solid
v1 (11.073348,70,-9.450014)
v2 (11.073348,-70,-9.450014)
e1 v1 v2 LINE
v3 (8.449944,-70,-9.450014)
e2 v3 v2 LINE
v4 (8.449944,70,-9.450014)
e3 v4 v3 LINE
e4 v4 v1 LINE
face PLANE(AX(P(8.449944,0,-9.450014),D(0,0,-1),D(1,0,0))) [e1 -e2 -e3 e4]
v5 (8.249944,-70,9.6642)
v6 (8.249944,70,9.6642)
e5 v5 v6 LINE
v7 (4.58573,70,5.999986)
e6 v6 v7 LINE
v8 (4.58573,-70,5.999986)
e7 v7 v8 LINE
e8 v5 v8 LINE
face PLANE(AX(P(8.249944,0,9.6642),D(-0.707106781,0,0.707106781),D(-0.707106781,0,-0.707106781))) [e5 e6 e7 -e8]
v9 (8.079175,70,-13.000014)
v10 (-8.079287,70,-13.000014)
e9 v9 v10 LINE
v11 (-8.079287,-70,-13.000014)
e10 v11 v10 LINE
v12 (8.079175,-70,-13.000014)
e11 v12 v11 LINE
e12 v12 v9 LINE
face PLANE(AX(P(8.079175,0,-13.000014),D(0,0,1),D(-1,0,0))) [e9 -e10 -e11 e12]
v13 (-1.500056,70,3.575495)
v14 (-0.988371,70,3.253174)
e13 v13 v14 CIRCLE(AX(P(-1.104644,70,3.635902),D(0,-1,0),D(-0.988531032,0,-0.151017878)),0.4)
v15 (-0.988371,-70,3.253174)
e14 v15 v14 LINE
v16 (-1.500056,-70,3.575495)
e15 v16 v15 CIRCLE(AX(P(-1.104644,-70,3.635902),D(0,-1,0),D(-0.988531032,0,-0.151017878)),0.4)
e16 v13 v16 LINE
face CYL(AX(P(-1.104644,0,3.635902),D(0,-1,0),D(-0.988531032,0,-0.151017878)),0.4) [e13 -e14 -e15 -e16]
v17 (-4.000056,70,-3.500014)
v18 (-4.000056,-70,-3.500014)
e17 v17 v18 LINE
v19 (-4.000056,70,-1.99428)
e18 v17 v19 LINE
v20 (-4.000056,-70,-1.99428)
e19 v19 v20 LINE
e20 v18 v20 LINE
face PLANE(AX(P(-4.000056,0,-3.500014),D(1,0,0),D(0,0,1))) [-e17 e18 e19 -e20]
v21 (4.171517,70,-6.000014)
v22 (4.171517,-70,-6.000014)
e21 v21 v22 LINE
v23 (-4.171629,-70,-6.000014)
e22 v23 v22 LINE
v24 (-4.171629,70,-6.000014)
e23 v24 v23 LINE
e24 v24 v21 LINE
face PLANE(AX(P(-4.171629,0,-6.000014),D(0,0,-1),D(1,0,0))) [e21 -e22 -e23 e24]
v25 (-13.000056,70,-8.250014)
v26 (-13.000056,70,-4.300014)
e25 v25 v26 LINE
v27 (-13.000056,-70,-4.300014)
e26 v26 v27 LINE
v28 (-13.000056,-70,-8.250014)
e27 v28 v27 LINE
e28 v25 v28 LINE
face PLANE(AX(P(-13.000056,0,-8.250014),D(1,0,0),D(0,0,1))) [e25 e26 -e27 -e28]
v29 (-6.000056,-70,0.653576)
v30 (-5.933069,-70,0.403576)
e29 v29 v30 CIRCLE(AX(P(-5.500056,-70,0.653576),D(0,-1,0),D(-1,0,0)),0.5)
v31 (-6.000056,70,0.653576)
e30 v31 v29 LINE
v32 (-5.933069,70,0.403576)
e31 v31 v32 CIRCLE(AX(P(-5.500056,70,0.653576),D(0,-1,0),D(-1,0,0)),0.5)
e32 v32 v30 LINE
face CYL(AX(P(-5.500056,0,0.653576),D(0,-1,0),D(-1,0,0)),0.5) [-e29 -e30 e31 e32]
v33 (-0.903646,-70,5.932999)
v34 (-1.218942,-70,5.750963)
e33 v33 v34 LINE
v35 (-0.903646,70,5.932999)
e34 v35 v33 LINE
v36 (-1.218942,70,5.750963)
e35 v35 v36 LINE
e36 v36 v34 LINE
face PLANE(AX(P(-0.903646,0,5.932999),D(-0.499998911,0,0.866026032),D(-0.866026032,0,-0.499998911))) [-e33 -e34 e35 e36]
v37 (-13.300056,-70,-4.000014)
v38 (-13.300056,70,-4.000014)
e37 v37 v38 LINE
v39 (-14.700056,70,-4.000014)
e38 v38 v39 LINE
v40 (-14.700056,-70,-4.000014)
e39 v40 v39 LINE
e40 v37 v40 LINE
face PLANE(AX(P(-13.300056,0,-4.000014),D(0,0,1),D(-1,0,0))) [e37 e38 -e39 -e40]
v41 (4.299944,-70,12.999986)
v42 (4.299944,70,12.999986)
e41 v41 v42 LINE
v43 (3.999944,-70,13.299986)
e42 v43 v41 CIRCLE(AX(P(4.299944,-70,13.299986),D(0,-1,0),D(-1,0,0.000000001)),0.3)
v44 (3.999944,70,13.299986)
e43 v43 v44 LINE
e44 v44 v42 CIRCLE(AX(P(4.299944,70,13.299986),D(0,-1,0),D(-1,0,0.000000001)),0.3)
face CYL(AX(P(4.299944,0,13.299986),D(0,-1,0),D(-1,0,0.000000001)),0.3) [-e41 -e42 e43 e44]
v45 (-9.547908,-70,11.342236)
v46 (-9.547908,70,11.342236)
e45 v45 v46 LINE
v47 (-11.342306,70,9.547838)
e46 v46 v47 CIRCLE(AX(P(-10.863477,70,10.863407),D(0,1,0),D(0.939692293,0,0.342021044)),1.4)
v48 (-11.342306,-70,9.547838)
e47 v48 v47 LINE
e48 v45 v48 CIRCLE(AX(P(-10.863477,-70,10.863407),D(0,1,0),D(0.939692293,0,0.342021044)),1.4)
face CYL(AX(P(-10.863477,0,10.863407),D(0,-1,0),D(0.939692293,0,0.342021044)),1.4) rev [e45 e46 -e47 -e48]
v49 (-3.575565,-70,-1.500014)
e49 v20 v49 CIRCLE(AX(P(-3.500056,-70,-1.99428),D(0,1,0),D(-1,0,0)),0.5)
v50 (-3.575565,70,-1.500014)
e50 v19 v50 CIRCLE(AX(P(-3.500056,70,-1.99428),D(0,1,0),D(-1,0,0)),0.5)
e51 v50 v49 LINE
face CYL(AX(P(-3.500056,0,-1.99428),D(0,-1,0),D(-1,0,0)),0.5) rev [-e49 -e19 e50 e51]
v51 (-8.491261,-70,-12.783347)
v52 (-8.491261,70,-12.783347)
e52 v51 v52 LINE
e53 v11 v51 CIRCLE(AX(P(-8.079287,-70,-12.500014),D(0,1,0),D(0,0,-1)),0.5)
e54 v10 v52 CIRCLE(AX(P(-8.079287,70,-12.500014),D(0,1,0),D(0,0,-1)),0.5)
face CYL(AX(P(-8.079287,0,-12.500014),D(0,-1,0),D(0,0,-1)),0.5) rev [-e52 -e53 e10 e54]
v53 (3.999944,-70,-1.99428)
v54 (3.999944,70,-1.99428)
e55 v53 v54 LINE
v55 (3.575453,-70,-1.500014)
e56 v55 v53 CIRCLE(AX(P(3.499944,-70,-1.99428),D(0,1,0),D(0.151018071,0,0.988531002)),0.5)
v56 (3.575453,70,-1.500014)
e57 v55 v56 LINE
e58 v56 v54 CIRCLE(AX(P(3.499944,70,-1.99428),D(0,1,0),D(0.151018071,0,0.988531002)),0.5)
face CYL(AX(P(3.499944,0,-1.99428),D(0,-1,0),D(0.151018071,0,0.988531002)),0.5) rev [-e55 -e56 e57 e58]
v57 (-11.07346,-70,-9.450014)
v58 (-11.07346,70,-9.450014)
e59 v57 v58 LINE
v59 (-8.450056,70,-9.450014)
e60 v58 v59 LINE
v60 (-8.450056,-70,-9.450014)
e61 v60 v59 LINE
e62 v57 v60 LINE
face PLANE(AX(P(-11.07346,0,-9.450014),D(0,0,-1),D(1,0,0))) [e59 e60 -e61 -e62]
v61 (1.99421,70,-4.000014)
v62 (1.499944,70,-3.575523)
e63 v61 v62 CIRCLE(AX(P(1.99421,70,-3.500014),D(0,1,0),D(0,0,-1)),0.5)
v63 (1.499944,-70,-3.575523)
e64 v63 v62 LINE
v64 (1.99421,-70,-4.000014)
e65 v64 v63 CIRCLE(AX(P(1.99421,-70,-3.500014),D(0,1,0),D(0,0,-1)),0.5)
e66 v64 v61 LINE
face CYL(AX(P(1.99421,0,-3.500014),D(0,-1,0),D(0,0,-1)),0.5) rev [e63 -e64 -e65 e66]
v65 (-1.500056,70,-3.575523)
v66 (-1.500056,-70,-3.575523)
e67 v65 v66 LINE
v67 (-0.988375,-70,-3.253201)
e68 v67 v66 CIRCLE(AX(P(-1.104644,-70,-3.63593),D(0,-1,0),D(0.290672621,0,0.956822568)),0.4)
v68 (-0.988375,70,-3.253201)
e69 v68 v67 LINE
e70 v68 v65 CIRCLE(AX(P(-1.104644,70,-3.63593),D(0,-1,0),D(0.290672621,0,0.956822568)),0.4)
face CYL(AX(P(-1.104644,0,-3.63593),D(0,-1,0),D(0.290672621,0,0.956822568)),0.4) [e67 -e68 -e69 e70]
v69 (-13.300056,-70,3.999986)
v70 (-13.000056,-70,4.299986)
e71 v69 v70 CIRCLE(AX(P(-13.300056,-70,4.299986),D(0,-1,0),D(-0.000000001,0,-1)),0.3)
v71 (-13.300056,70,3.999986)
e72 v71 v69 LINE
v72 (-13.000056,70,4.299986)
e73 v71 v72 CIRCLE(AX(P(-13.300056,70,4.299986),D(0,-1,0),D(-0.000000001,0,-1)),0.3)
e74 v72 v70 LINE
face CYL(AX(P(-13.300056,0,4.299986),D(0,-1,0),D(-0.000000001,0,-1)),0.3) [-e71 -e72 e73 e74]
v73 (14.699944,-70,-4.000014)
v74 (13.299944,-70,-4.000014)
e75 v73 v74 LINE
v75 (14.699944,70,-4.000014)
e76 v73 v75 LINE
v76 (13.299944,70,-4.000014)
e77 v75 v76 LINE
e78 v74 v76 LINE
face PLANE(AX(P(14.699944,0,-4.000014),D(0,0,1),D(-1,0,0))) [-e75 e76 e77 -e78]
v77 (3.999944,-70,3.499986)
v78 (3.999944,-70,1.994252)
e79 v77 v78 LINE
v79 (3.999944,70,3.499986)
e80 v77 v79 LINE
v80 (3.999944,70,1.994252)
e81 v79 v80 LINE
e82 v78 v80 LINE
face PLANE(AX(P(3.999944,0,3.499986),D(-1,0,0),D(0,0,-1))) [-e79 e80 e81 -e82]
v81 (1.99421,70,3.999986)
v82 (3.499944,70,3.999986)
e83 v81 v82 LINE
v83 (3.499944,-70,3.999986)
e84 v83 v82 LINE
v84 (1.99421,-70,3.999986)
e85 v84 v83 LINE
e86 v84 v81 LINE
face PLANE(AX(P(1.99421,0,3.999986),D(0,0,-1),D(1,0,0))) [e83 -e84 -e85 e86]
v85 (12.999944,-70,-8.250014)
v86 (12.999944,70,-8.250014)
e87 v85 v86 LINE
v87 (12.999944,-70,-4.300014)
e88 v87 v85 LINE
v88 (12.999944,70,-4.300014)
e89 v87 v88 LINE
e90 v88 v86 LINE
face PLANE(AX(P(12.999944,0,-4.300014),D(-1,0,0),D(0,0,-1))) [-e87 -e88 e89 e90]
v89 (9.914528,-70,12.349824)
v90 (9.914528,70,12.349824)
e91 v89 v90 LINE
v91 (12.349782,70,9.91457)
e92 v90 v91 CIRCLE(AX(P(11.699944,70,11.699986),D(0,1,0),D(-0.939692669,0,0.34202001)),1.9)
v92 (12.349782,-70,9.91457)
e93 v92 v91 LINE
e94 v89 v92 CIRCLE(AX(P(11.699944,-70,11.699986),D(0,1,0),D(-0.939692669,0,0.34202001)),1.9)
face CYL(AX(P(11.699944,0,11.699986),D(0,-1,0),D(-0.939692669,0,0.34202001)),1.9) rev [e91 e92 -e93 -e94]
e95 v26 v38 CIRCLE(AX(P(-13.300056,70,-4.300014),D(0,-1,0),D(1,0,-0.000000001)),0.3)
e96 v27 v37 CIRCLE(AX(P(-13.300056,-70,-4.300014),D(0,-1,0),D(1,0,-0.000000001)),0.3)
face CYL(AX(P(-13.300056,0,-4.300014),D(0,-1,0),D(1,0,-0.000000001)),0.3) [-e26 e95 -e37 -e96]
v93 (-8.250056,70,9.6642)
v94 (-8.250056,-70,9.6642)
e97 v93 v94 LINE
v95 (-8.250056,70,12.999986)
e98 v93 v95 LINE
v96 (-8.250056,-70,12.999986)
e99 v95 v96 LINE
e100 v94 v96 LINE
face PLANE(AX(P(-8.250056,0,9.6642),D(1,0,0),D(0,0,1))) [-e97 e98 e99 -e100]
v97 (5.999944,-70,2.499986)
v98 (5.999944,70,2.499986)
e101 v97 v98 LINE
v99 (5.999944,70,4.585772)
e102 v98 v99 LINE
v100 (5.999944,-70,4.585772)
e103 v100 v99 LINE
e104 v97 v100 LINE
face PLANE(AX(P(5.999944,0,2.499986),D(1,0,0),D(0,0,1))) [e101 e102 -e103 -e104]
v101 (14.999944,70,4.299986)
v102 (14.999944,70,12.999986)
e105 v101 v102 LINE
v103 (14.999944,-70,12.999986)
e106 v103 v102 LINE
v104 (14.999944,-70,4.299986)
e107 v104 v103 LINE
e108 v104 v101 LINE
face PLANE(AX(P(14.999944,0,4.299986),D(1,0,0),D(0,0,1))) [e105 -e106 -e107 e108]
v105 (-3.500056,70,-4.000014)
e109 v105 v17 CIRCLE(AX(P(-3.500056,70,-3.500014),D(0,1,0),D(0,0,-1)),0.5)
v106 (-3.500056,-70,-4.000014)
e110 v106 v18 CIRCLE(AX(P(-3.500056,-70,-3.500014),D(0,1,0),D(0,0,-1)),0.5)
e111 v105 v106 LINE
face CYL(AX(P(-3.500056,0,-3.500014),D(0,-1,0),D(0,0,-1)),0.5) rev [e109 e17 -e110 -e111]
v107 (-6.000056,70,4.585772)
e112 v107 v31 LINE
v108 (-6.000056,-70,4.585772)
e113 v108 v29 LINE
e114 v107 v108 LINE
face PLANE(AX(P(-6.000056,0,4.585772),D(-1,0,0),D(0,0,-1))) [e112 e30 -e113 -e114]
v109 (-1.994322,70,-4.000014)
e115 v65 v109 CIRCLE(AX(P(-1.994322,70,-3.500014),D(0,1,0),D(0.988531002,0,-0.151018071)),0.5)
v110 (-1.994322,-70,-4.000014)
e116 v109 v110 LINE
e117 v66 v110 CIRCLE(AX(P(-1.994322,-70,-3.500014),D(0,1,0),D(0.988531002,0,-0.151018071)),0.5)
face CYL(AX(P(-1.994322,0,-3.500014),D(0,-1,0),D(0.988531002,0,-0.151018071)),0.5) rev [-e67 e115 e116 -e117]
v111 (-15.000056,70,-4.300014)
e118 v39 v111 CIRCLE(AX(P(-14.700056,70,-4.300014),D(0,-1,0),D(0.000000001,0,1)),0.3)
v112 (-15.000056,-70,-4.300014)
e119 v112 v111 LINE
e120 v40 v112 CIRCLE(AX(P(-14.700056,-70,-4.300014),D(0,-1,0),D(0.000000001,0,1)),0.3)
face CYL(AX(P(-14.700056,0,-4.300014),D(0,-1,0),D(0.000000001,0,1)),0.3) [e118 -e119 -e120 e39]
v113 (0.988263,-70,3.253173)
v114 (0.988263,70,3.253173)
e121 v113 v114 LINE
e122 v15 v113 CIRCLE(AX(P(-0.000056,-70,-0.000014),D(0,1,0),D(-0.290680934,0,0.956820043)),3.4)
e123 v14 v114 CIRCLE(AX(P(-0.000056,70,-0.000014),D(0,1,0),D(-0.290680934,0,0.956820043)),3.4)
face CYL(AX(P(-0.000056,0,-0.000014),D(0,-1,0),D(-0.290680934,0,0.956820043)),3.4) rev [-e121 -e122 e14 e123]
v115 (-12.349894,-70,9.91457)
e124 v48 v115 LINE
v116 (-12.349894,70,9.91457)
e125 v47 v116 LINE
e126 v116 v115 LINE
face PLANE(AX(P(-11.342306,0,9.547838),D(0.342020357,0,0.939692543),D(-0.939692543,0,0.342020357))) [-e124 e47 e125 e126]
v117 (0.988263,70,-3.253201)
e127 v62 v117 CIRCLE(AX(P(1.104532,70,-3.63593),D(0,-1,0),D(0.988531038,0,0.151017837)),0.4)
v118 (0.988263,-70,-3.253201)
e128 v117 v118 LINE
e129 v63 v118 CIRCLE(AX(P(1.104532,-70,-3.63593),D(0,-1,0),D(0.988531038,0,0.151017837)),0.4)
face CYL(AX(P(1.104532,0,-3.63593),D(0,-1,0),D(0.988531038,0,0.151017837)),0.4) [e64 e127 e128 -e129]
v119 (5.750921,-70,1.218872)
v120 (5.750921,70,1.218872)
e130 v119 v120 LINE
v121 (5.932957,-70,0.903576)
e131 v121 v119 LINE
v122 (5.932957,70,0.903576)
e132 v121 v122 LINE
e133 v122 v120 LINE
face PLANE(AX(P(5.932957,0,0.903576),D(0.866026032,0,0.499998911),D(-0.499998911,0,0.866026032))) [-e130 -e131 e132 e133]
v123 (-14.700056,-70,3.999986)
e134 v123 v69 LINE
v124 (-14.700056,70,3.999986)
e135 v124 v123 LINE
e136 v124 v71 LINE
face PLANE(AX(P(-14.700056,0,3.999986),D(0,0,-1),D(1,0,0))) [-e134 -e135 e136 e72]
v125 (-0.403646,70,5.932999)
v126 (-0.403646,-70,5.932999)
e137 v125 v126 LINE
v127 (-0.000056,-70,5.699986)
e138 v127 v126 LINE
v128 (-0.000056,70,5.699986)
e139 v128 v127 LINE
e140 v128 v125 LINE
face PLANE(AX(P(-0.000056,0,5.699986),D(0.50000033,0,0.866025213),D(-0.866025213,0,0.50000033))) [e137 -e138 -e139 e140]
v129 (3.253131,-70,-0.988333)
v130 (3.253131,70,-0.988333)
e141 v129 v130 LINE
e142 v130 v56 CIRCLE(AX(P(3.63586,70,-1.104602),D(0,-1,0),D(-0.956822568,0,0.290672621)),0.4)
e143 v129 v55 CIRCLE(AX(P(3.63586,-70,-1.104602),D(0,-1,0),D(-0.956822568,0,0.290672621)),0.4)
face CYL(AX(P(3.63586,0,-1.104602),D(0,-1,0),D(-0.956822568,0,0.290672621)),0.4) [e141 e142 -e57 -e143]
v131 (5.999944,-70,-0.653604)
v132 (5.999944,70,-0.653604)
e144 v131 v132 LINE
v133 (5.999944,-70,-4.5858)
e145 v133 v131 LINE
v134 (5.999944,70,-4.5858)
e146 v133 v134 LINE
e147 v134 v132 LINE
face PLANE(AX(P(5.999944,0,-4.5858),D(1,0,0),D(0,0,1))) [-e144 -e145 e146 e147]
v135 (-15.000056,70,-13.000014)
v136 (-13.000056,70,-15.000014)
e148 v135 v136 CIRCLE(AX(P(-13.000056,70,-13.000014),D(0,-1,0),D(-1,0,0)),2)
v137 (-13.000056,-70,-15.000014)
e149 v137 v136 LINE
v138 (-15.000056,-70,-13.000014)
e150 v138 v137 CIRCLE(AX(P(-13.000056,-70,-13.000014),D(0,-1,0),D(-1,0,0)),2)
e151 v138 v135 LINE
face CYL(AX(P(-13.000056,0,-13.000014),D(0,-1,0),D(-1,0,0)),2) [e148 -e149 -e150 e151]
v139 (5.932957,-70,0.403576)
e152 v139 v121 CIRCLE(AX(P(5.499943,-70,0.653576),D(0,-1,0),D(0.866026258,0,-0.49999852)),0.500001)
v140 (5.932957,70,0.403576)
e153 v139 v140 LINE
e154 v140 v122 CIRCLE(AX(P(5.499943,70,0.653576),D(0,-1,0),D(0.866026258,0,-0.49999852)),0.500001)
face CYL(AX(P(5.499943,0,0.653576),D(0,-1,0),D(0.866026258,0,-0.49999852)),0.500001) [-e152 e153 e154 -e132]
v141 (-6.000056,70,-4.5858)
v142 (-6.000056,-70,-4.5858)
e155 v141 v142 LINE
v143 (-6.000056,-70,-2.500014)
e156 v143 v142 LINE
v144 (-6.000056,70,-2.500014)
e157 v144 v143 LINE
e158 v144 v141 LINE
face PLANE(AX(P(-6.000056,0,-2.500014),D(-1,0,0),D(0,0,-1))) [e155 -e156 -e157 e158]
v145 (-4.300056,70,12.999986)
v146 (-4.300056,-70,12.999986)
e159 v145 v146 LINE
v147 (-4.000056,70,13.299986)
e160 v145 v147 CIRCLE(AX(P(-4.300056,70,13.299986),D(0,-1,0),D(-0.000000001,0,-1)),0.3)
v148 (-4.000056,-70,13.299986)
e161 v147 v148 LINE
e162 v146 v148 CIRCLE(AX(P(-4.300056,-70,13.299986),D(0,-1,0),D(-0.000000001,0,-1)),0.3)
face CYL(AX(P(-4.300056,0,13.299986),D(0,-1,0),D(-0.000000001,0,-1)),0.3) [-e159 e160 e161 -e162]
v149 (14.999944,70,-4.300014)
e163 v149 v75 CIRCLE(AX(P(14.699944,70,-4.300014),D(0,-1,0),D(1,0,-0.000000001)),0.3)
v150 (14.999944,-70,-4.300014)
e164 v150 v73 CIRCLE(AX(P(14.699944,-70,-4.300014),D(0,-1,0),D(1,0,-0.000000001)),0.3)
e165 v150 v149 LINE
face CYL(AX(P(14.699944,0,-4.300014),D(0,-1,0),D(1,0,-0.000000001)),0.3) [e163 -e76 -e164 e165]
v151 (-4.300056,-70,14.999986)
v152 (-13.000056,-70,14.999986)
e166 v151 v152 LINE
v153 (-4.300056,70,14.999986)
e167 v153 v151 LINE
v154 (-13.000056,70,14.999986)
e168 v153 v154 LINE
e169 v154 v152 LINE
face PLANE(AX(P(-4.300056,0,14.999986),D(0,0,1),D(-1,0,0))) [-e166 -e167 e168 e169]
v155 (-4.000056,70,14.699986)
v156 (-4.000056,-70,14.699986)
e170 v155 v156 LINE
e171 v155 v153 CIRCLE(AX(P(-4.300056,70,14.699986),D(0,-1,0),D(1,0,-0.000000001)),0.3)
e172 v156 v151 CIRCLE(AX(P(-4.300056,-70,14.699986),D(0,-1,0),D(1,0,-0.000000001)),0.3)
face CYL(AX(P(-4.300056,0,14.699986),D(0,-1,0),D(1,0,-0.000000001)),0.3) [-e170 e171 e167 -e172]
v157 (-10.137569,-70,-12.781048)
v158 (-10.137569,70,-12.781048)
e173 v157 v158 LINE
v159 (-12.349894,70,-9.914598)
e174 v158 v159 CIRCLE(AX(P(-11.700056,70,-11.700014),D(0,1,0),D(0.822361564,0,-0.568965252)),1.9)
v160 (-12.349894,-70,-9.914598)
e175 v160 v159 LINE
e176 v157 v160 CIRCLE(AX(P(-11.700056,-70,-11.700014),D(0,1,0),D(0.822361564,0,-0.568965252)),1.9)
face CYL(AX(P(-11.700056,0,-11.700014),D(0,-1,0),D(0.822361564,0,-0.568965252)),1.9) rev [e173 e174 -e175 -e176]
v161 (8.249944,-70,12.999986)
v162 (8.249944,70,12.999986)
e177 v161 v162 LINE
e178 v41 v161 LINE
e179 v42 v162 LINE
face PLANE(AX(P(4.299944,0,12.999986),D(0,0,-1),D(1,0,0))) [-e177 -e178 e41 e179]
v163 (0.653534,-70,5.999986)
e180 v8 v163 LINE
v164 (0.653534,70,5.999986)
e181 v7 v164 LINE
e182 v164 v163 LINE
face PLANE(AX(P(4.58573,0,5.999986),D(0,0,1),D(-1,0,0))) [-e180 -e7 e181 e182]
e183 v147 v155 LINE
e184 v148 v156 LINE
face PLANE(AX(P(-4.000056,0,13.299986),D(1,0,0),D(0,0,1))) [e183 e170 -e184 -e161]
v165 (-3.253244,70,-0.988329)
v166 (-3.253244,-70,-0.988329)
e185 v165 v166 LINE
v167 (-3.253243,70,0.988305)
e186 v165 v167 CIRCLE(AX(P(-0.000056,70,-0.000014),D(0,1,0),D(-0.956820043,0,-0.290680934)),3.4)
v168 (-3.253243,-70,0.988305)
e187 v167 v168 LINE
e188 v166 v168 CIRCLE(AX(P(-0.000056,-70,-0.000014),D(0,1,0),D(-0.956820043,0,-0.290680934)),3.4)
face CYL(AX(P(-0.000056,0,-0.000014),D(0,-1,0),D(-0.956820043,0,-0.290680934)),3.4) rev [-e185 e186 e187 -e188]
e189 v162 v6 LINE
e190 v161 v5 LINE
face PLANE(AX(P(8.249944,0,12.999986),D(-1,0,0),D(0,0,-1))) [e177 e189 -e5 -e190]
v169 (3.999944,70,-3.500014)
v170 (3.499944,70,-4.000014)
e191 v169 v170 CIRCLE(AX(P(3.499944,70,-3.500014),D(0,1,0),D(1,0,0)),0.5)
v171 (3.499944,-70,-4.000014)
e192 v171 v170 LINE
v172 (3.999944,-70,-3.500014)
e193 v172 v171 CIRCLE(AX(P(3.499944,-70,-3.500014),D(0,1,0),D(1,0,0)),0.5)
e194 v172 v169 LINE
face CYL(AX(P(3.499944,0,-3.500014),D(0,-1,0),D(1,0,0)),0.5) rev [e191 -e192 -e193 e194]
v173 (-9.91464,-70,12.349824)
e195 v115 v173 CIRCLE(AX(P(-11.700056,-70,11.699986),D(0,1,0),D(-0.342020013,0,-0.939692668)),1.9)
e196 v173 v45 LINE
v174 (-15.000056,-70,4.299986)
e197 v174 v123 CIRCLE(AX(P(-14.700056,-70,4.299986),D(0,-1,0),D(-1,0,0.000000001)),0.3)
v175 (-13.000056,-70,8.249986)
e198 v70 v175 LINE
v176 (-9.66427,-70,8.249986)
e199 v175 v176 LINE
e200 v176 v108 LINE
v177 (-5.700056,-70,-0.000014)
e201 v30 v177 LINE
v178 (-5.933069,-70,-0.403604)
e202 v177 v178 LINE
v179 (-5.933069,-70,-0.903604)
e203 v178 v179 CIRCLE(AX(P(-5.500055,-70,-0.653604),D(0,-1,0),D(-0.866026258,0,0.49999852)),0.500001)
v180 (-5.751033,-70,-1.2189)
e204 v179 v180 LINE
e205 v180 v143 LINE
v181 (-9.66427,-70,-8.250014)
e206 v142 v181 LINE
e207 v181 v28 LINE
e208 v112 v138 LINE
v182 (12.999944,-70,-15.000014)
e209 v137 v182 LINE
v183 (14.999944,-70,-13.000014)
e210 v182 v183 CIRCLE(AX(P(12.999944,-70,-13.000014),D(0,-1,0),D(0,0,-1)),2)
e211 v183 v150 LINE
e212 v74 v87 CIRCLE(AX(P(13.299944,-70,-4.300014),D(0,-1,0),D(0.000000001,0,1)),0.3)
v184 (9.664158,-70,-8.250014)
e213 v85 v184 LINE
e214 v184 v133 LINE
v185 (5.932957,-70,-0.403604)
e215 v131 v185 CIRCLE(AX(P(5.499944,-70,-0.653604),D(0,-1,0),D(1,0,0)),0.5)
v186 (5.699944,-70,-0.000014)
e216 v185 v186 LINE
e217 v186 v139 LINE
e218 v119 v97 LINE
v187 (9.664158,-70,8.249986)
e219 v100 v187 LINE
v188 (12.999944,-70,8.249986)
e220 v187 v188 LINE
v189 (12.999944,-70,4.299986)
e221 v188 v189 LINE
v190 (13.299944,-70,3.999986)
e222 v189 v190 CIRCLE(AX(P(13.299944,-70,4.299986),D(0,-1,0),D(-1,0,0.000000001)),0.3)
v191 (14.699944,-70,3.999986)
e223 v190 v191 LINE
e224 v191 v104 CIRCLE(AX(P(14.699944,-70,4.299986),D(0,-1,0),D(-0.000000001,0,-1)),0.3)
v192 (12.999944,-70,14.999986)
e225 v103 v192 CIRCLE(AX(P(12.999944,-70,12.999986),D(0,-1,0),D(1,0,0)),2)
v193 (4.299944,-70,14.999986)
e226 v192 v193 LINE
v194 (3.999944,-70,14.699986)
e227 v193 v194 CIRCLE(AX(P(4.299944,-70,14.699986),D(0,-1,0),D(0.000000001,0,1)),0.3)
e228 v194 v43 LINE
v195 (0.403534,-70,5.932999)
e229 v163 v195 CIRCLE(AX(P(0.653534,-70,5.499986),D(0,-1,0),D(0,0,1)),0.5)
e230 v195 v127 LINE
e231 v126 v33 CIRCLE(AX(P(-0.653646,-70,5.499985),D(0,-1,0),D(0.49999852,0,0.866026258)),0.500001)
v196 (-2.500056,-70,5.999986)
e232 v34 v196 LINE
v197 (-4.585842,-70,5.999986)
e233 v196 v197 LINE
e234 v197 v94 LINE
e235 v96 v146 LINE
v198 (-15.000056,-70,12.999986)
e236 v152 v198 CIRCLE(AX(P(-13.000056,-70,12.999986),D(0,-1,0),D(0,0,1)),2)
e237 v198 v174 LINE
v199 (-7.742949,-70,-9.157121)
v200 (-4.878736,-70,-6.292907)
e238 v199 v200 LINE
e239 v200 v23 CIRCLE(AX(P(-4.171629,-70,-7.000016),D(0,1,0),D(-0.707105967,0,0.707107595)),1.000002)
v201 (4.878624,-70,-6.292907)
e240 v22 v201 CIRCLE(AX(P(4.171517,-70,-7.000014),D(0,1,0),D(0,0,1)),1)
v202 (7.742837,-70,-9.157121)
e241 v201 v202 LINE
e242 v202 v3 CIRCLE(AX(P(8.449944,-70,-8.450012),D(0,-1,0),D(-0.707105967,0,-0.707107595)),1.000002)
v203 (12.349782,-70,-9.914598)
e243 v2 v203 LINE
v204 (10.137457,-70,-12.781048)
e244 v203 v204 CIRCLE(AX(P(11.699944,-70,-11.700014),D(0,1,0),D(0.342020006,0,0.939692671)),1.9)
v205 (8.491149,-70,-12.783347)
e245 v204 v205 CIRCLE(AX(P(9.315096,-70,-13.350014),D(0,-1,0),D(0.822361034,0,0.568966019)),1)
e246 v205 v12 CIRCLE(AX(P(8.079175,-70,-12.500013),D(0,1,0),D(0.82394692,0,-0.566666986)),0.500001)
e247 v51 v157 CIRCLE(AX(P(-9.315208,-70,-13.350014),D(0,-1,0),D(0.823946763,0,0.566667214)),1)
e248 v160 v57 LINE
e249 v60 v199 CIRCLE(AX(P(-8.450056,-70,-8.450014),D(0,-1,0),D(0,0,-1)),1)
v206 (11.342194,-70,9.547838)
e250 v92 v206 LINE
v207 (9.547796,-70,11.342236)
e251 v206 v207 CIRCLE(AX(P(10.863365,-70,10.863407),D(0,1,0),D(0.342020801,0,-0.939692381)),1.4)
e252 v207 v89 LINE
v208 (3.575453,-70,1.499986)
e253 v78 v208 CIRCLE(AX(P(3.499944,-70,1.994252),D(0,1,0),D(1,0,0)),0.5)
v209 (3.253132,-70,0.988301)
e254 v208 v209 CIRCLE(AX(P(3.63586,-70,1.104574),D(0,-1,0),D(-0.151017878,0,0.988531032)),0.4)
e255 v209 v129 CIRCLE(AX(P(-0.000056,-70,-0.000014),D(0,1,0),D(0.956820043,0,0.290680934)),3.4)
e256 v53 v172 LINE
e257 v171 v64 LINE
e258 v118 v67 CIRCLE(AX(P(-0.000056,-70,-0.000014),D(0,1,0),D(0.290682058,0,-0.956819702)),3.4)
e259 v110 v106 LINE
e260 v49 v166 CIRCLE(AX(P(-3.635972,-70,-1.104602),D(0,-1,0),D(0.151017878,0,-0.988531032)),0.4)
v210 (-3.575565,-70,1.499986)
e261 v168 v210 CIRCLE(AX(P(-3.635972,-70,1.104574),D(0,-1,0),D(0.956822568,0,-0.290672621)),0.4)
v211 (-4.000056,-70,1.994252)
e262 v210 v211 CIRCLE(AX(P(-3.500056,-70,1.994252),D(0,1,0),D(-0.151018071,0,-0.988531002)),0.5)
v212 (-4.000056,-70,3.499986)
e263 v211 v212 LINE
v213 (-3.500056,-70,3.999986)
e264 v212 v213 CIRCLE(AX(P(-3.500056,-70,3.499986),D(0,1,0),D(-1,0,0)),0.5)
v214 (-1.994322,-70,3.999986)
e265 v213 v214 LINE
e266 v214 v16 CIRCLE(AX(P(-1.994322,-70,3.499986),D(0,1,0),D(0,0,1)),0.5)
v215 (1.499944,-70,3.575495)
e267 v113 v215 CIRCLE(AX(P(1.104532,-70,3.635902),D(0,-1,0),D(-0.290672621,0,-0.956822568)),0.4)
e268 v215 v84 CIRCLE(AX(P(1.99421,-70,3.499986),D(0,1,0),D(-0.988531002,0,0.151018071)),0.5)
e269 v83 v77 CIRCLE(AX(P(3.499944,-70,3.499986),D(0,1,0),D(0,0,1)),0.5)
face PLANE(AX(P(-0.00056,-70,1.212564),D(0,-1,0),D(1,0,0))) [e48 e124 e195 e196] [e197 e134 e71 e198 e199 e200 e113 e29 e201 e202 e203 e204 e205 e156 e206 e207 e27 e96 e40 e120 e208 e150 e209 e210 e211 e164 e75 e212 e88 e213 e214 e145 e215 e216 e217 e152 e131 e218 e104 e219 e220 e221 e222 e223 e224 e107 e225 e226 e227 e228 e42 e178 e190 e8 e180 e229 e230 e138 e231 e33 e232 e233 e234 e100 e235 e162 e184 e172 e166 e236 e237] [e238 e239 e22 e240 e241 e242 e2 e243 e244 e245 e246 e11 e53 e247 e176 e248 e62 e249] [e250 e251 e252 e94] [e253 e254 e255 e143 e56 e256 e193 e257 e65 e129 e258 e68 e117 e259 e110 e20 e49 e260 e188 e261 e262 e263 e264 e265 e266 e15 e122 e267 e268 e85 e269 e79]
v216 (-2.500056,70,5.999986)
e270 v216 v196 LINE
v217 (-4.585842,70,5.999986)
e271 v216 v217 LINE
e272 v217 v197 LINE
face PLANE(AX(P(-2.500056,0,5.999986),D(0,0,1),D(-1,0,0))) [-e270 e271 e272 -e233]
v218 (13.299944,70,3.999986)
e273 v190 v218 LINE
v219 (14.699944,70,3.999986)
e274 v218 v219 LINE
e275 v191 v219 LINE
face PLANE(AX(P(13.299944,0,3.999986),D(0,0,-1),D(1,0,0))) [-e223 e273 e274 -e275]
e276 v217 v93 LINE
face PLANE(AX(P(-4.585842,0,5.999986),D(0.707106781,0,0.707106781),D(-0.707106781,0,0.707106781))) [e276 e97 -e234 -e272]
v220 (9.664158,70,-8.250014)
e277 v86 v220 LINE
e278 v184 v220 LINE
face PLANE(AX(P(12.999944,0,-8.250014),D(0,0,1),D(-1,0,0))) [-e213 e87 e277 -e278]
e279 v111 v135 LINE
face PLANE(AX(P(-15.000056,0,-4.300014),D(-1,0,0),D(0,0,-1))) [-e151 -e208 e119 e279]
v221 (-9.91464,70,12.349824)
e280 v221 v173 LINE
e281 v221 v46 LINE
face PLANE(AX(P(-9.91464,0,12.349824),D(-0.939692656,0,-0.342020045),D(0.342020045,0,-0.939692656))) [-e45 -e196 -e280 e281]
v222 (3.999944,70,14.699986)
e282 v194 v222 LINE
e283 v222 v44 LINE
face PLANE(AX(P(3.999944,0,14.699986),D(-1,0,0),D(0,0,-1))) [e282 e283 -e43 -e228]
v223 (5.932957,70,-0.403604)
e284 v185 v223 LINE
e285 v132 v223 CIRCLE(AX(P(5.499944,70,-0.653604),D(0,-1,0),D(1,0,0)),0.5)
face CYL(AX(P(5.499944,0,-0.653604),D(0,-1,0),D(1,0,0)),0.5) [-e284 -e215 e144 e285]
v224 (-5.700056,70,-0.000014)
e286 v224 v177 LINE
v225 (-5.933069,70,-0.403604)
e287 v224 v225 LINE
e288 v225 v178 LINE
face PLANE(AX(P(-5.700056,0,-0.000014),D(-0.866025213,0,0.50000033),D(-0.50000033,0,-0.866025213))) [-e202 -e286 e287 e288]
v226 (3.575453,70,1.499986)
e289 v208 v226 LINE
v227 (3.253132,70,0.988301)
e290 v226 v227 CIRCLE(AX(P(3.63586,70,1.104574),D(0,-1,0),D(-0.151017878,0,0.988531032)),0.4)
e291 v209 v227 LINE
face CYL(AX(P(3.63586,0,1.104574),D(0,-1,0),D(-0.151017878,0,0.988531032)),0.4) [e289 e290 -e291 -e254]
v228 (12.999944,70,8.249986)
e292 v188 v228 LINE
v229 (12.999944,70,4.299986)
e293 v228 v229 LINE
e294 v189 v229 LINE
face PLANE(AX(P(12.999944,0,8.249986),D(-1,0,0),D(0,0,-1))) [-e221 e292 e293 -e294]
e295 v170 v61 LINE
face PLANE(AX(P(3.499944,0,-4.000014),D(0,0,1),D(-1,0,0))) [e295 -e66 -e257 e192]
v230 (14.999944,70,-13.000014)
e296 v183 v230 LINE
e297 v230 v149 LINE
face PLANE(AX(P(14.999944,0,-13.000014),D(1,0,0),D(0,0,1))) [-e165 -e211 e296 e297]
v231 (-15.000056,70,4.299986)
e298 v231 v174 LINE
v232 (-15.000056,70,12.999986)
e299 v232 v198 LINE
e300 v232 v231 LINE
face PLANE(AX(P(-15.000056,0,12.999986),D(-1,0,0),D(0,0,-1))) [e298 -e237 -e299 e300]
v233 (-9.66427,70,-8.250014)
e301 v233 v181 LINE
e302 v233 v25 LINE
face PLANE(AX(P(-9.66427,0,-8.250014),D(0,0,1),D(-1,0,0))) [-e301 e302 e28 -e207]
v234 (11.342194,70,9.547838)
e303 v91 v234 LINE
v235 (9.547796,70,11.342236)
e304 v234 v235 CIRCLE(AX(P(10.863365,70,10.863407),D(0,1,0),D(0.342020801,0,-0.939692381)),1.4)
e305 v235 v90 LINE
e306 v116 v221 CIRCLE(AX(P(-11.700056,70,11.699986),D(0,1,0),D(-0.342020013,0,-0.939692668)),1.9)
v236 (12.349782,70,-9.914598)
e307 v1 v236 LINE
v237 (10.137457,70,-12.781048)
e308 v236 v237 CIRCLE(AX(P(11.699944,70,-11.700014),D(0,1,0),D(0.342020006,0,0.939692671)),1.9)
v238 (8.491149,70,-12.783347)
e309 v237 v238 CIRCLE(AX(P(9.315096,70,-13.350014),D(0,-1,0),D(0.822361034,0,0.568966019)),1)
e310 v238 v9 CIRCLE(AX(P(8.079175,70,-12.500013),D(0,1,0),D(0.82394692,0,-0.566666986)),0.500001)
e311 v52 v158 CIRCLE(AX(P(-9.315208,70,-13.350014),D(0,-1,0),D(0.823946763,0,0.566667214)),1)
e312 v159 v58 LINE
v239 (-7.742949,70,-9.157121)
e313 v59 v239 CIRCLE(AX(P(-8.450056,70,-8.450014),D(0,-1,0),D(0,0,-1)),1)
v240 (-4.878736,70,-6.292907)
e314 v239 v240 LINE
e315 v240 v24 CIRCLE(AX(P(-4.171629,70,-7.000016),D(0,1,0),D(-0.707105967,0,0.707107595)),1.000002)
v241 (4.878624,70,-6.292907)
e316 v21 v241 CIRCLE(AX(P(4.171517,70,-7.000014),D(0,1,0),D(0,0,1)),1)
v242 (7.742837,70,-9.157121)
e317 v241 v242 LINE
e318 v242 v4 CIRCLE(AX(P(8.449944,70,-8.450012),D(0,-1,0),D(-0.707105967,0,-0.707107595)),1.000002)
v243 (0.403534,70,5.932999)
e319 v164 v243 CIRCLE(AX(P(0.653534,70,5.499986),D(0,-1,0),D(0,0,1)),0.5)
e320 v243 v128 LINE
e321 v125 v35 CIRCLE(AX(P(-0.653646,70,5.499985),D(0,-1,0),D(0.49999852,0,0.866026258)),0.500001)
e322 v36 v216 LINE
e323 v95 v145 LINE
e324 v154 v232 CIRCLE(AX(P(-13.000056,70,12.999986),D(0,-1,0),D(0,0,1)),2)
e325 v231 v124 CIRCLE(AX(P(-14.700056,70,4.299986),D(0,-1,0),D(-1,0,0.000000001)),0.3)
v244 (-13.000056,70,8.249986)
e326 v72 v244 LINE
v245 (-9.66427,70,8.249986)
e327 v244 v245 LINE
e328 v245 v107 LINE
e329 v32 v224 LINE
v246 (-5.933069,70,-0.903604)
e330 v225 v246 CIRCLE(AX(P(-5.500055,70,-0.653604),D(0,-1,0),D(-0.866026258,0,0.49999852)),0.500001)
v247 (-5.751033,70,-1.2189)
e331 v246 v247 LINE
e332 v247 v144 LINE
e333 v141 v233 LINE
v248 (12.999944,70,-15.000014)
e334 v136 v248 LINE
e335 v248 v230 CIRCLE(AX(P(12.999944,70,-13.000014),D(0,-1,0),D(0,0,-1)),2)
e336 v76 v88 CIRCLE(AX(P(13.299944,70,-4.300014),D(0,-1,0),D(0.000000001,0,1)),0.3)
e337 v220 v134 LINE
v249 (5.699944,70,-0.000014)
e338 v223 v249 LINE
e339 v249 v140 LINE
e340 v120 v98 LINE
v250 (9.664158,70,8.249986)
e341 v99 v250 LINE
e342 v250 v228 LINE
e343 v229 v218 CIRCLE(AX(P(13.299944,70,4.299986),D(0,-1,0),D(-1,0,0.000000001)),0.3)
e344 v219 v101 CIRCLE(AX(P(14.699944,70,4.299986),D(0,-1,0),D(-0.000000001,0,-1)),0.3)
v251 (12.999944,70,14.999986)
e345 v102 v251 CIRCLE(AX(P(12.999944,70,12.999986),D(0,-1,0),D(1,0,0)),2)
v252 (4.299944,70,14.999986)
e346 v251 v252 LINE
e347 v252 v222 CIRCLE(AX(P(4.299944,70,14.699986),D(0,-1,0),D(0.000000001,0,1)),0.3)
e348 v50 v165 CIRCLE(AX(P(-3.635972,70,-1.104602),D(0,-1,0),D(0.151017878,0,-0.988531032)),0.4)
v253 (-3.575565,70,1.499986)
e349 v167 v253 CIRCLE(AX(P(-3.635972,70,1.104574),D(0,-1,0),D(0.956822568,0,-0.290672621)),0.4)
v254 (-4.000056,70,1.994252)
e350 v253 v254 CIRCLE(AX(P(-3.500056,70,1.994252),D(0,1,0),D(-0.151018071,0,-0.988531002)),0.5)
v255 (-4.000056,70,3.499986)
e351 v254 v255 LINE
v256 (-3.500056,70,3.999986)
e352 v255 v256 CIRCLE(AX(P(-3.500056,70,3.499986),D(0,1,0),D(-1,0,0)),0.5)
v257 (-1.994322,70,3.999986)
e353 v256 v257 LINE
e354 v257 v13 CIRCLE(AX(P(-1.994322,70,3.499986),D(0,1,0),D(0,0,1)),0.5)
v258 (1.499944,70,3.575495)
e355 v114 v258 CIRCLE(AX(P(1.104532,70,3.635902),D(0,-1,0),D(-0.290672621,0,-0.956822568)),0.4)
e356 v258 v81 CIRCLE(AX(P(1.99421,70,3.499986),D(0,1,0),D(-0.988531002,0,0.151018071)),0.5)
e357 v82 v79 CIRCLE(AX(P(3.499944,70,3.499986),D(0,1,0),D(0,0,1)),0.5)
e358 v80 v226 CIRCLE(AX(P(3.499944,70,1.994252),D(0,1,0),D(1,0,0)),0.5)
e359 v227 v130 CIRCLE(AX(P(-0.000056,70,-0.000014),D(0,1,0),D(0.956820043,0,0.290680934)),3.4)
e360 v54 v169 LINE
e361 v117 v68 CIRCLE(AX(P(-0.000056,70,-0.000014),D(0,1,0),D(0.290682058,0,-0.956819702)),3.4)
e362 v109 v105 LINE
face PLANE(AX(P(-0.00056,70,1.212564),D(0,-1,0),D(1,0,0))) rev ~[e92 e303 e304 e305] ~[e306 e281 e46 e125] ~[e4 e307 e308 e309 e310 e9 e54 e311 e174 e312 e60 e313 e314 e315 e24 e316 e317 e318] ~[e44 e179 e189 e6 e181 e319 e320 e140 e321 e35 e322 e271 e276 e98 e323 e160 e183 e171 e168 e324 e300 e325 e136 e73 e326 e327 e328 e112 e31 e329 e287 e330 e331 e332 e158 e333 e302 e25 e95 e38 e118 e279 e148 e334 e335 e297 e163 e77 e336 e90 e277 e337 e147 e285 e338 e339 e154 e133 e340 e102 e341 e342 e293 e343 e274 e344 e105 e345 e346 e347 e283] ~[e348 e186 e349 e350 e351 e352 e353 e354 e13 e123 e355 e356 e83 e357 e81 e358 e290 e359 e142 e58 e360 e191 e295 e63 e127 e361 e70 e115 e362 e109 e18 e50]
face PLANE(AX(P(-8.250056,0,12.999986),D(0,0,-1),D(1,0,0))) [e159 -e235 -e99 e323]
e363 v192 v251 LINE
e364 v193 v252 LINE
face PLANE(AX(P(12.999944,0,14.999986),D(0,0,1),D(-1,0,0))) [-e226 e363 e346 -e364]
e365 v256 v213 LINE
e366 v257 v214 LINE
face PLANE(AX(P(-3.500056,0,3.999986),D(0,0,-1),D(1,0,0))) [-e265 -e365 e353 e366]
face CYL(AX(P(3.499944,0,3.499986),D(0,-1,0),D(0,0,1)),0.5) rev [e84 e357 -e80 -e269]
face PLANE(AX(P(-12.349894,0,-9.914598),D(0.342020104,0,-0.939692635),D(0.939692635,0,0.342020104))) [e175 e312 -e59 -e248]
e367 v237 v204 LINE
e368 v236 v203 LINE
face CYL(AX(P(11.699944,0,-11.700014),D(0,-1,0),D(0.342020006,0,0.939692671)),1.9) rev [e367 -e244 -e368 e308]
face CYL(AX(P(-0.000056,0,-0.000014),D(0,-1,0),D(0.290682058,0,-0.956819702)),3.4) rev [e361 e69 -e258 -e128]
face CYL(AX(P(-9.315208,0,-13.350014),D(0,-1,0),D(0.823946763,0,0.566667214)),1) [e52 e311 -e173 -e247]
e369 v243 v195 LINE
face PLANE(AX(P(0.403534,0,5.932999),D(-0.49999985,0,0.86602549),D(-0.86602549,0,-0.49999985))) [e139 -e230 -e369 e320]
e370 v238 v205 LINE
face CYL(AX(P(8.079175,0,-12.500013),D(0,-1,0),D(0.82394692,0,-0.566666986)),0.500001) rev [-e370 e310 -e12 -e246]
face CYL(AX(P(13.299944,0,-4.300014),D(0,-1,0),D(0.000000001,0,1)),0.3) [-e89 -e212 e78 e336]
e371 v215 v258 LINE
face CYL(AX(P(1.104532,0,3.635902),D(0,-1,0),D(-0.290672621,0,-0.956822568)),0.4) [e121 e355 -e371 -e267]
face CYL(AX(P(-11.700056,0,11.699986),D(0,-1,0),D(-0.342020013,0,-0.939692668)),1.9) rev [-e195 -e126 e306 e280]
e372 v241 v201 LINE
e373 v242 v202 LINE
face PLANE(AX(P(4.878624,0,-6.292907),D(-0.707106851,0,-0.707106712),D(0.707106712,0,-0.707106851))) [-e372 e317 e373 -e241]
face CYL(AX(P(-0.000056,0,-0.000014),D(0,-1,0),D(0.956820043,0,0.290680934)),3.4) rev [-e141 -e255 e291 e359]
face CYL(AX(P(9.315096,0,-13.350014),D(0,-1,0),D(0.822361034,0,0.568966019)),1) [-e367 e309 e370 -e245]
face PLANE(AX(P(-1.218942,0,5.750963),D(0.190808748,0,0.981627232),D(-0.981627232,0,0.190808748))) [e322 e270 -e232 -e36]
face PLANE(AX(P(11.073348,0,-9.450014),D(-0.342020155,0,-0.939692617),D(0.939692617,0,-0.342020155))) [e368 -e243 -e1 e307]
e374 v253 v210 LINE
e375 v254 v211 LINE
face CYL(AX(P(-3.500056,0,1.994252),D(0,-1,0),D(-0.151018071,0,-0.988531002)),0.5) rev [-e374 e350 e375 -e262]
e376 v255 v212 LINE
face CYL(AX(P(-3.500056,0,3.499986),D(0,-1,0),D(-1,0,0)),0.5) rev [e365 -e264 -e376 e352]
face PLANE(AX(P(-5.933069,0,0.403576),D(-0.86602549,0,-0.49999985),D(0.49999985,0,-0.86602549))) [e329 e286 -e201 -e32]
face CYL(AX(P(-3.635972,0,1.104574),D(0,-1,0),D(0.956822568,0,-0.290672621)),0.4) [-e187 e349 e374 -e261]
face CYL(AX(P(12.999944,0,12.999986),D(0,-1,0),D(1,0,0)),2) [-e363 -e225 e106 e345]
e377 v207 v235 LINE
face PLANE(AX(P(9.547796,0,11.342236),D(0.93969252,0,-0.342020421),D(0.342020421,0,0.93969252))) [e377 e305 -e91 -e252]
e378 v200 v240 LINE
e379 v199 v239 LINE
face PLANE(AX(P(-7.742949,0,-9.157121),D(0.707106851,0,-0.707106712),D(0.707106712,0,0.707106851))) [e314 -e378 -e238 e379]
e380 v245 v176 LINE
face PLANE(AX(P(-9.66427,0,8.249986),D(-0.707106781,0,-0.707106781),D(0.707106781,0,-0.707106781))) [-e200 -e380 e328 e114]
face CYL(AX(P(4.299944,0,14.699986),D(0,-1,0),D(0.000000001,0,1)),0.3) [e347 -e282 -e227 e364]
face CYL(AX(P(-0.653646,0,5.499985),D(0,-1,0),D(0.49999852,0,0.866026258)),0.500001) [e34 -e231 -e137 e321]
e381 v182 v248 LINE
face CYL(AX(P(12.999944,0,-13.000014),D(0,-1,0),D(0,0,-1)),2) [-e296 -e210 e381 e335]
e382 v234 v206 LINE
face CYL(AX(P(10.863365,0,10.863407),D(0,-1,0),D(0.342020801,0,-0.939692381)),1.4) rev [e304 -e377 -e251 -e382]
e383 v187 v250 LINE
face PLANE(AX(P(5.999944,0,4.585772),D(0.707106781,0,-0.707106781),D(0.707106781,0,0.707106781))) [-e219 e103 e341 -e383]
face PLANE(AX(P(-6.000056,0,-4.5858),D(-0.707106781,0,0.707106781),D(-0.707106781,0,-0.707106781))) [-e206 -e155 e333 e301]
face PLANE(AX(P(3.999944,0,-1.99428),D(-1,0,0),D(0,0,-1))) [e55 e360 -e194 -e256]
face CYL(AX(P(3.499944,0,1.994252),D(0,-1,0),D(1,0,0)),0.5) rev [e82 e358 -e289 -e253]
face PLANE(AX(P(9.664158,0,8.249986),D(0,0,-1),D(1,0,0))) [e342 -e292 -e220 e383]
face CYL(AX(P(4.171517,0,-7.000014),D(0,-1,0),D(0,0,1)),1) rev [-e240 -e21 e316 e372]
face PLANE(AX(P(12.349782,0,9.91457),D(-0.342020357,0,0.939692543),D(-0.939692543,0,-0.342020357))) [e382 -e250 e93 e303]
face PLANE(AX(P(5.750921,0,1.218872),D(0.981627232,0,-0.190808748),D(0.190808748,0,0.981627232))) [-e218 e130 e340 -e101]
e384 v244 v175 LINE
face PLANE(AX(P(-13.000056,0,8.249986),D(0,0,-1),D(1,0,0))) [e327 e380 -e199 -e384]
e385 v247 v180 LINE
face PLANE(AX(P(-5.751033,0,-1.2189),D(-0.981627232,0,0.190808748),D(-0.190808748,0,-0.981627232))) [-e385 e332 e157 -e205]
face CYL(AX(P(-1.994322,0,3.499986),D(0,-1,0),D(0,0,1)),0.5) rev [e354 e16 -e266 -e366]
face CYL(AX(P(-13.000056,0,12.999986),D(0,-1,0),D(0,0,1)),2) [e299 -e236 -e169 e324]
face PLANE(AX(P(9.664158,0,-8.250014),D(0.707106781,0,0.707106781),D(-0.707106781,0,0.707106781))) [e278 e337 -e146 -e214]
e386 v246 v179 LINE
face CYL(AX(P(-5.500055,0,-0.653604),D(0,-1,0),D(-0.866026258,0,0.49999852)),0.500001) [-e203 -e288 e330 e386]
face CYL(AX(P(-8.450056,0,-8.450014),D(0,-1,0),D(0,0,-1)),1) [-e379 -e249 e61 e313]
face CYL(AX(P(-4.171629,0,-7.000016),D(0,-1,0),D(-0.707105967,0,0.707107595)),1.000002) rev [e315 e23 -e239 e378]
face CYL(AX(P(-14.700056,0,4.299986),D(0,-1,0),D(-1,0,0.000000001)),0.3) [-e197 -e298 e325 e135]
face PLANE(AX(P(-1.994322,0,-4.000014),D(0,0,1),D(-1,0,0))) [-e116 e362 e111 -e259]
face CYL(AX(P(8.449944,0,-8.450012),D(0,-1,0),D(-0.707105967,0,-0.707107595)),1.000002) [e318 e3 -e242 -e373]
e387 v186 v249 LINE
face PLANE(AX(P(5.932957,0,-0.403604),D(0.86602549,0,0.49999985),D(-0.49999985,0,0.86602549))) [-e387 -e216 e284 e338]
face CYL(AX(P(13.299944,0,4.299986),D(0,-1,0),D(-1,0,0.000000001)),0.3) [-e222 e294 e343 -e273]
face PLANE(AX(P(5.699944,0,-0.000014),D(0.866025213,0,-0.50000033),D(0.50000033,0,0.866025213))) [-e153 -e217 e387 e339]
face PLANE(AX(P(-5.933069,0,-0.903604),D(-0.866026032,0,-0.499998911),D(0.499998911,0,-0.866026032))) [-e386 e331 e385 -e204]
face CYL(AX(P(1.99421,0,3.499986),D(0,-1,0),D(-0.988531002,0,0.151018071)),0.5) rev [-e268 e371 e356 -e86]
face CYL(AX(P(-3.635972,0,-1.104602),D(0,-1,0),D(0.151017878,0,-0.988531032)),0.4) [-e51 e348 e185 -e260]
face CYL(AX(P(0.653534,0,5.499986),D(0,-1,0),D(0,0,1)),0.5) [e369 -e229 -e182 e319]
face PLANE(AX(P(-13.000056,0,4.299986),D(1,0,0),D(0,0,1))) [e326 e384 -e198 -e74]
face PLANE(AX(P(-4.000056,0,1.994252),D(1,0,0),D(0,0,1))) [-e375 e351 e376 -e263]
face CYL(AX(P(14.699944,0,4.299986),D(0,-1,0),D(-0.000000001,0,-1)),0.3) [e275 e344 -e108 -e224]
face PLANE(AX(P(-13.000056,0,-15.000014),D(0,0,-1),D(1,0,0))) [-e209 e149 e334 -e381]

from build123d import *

# Parameters (mm, degrees)
F2_DEPTH = 70


# Not quite as in the source:
# - ends of sketch curves that miss each other by under 0.0002 mm in the source are joined


with BuildPart() as f2:
    # F1 (on Front) → F2 (new body, symmetric)
    with BuildSketch(Plane.XZ):
        with BuildLine():
            Line((8.249944, 9.6642), (4.58573, 5.999986))
            Line((4.58573, 5.999986), (0.653534, 5.999986))
            ThreePointArc((0.653534, 5.999986), (0.5241245494, 5.9829489324), (0.4035341291, 5.9329987764))
            Line((0.4035341291, 5.9329987764), (-5.6e-05, 5.699986))
            Line((-5.6e-05, 5.699986), (-0.403646, 5.932999))
            ThreePointArc((-0.403646, 5.932999), (-0.653646, 5.999986), (-0.9036458709, 5.9329987764))
            Line((-0.9036458709, 5.9329987764), (-1.218942, 5.750963))
            Line((-1.218942, 5.750963), (-2.500056, 5.999986))
            Line((-2.500056, 5.999986), (-4.585842, 5.999986))
            Line((-4.585842, 5.999986), (-8.250056, 9.6642))
            Line((-8.250056, 9.6642), (-8.250056, 12.999986))
            Line((-8.250056, 12.999986), (-4.300056, 12.999986))
            ThreePointArc((-4.300056, 12.999986), (-4.0879239656, 13.0878539656), (-4.000056, 13.299986))
            Line((-4.000056, 13.299986), (-4.000056, 14.699986))
            ThreePointArc((-4.000056, 14.699986), (-4.0879239656, 14.9121180344), (-4.300056, 14.999986))
            Line((-4.300056, 14.999986), (-13.000056, 14.999986))
            ThreePointArc((-13.000056, 14.999986), (-14.4142695624, 14.4141995624), (-15.000056, 12.999986))
            Line((-15.000056, 12.999986), (-15.000056, 4.299986))
            ThreePointArc((-15.000056, 4.299986), (-14.9121880344, 4.0878539656), (-14.700056, 3.999986))
            Line((-14.700056, 3.999986), (-13.300056, 3.999986))
            ThreePointArc((-13.300056, 3.999986), (-13.0879239656, 4.0878539656), (-13.000056, 4.299986))
            Line((-13.000056, 4.299986), (-13.000056, 8.249986))
            Line((-13.000056, 8.249986), (-9.66427, 8.249986))
            Line((-9.66427, 8.249986), (-6.000056, 4.585772))
            Line((-6.000056, 4.585772), (-6.000056, 0.653576))
            ThreePointArc((-6.000056, 0.653576), (-5.9830189324, 0.5241665494), (-5.9330687764, 0.4035761291))
            Line((-5.9330687764, 0.4035761291), (-5.700056, -1.4e-05))
            Line((-5.700056, -1.4e-05), (-5.933069, -0.403604))
            ThreePointArc((-5.933069, -0.403604), (-6.000056, -0.653604), (-5.9330687764, -0.9036038709))
            Line((-5.9330687764, -0.9036038709), (-5.751033, -1.2189))
            Line((-5.751033, -1.2189), (-6.000056, -2.500014))
            Line((-6.000056, -2.500014), (-6.000056, -4.5858))
            Line((-6.000056, -4.5858), (-9.66427, -8.250014))
            Line((-9.66427, -8.250014), (-13.000056, -8.250014))
            Line((-13.000056, -8.250014), (-13.000056, -4.300014))
            ThreePointArc((-13.000056, -4.300014), (-13.0879239656, -4.0878819656), (-13.300056, -4.000014))
            Line((-13.300056, -4.000014), (-14.700056, -4.000014))
            ThreePointArc((-14.700056, -4.000014), (-14.9121880344, -4.0878819656), (-15.000056, -4.300014))
            Line((-15.000056, -4.300014), (-15.000056, -13.000014))
            ThreePointArc((-15.000056, -13.000014), (-14.4142695624, -14.4142275624), (-13.000056, -15.000014))
            Line((-13.000056, -15.000014), (12.999944, -15.000014))
            ThreePointArc((12.999944, -15.000014), (14.4141575624, -14.4142275624), (14.999944, -13.000014))
            Line((14.999944, -13.000014), (14.999944, -4.300014))
            ThreePointArc((14.999944, -4.300014), (14.9120760344, -4.0878819656), (14.699944, -4.000014))
            Line((14.699944, -4.000014), (13.299944, -4.000014))
            ThreePointArc((13.299944, -4.000014), (13.0878119656, -4.0878819656), (12.999944, -4.300014))
            Line((12.999944, -4.300014), (12.999944, -8.250014))
            Line((12.999944, -8.250014), (9.664158, -8.250014))
            Line((9.664158, -8.250014), (5.999944, -4.5858))
            Line((5.999944, -4.5858), (5.999944, -0.653604))
            ThreePointArc((5.999944, -0.653604), (5.9829069324, -0.5241945494), (5.9329567764, -0.4036041291))
            Line((5.9329567764, -0.4036041291), (5.699944, -1.4e-05))
            Line((5.699944, -1.4e-05), (5.932957, 0.403576))
            ThreePointArc((5.932957, 0.403576), (5.999944, 0.653576), (5.9329567764, 0.9035758709))
            Line((5.9329567764, 0.9035758709), (5.750921, 1.218872))
            Line((5.750921, 1.218872), (5.999944, 2.499986))
            Line((5.999944, 2.499986), (5.999944, 4.585772))
            Line((5.999944, 4.585772), (9.664158, 8.249986))
            Line((9.664158, 8.249986), (12.999944, 8.249986))
            Line((12.999944, 8.249986), (12.999944, 4.299986))
            ThreePointArc((12.999944, 4.299986), (13.0878119656, 4.0878539656), (13.299944, 3.999986))
            Line((13.299944, 3.999986), (14.699944, 3.999986))
            ThreePointArc((14.699944, 3.999986), (14.9120760344, 4.0878539656), (14.999944, 4.299986))
            Line((14.999944, 4.299986), (14.999944, 12.999986))
            ThreePointArc((14.999944, 12.999986), (14.4141575624, 14.4141995624), (12.999944, 14.999986))
            Line((12.999944, 14.999986), (4.299944, 14.999986))
            ThreePointArc((4.299944, 14.999986), (4.0878119656, 14.9121180344), (3.999944, 14.699986))
            Line((3.999944, 14.699986), (3.999944, 13.299986))
            ThreePointArc((3.999944, 13.299986), (4.0878119656, 13.0878539656), (4.299944, 12.999986))
            Line((4.299944, 12.999986), (8.249944, 12.999986))
            Line((8.249944, 12.999986), (8.249944, 9.6642))
        make_face()
        with BuildLine():
            Line((-4.171629, -6.000014), (4.171517, -6.000014))
            ThreePointArc((4.171517, -6.000014), (4.5542004324, -6.0761344675), (4.8786237812, -6.2929072188))
            Line((4.8786237812, -6.2929072188), (7.742837, -9.157121))
            ThreePointArc((7.742837, -9.157121), (8.0672605676, -9.3738935325), (8.449944, -9.450014))
            Line((8.449944, -9.450014), (11.073348, -9.450014))
            Line((11.073348, -9.450014), (12.349782, -9.914598))
            ThreePointArc((12.349782, -9.914598), (13.2040603505, -12.8608903949), (10.1374570291, -12.7810479799))
            ThreePointArc((10.1374570291, -12.7810479799), (9.3136995047, -12.3500149751), (8.4911490608, -12.7833470418))
            ThreePointArc((8.4911490608, -12.7833470418), (8.3119125635, -12.9425444809), (8.079175, -13.000014))
            Line((8.079175, -13.000014), (-8.079287, -13.000014))
            ThreePointArc((-8.079287, -13.000014), (-8.3120245635, -12.9425444809), (-8.4912608636, -12.7833469062))
            ThreePointArc((-8.4912608636, -12.7833469062), (-9.3138115047, -12.3500149751), (-10.1375690315, -12.7810479782))
            ThreePointArc((-10.1375690315, -12.7810479782), (-13.2041723505, -12.8608903949), (-12.3498940253, -9.9145979306))
            Line((-12.3498940253, -9.9145979306), (-11.07346, -9.450014))
            Line((-11.07346, -9.450014), (-8.450056, -9.450014))
            ThreePointArc((-8.450056, -9.450014), (-8.0673725676, -9.3738935325), (-7.7429492188, -9.1571207812))
            Line((-7.7429492188, -9.1571207812), (-4.878736, -6.292907))
            ThreePointArc((-4.878736, -6.292907), (-4.5543124324, -6.0761344675), (-4.171629, -6.000014))
        make_face(mode=Mode.SUBTRACT)
        with BuildLine():
            ThreePointArc((-12.3498940253, 9.9145699306), (-13.0435588843, 13.0434888843), (-9.9146399306, 12.3498240253))
            Line((-9.9146399306, 12.3498240253), (-9.547908, 11.342236))
            ThreePointArc((-9.547908, 11.342236), (-9.8735275063, 9.8734575063), (-11.3423061215, 9.5478376661))
            Line((-11.3423061215, 9.5478376661), (-12.3498940253, 9.9145699306))
        make_face(mode=Mode.SUBTRACT)
        with BuildLine():
            ThreePointArc((0.9882629956, -3.2532009855), (-5.6e-05, -3.400014), (-0.9883749956, -3.2532009855))
            ThreePointArc((-0.9883749956, -3.2532009855), (-1.3178396431, -3.2974811593), (-1.5000564258, -3.5755229349))
            ThreePointArc((-1.5000564258, -3.5755229349), (-1.6685571025, -3.8793255231), (-1.994322, -4.000014))
            Line((-1.994322, -4.000014), (-3.500056, -4.000014))
            ThreePointArc((-3.500056, -4.000014), (-3.8536093906, -3.8535673906), (-4.000056, -3.500014))
            Line((-4.000056, -3.500014), (-4.000056, -1.99428))
            ThreePointArc((-4.000056, -1.99428), (-3.8793675231, -1.6685151025), (-3.5755649263, -1.5000144822))
            ThreePointArc((-3.5755649263, -1.5000144822), (-3.2975231593, -1.3177976431), (-3.2532441585, -0.9883290481))
            ThreePointArc((-3.2532441585, -0.9883290481), (-3.400056, -1.4e-05), (-3.2532429855, 0.9883049956))
            ThreePointArc((-3.2532429855, 0.9883049956), (-3.2975231593, 1.3177696431), (-3.5755649349, 1.4999864258))
            ThreePointArc((-3.5755649349, 1.4999864258), (-3.8793675231, 1.6684871025), (-4.000056, 1.994252))
            Line((-4.000056, 1.994252), (-4.000056, 3.499986))
            ThreePointArc((-4.000056, 3.499986), (-3.8536093906, 3.8535393906), (-3.500056, 3.999986))
            Line((-3.500056, 3.999986), (-1.994322, 3.999986))
            ThreePointArc((-1.994322, 3.999986), (-1.6685571025, 3.8792975231), (-1.5000564822, 3.5754949263))
            ThreePointArc((-1.5000564822, 3.5754949263), (-1.3178396431, 3.2974531593), (-0.9883710481, 3.2531741585))
            ThreePointArc((-0.9883710481, 3.2531741585), (-5.6e-05, 3.399986), (0.9882629956, 3.2531729855))
            ThreePointArc((0.9882629956, 3.2531729855), (1.3177276431, 3.2974531593), (1.4999444258, 3.5754949349))
            ThreePointArc((1.4999444258, 3.5754949349), (1.6684451025, 3.8792975231), (1.99421, 3.999986))
            Line((1.99421, 3.999986), (3.499944, 3.999986))
            ThreePointArc((3.499944, 3.999986), (3.8534973906, 3.8535393906), (3.999944, 3.499986))
            Line((3.999944, 3.499986), (3.999944, 1.994252))
            ThreePointArc((3.999944, 1.994252), (3.8792555231, 1.6684871025), (3.5754529263, 1.4999864822))
            ThreePointArc((3.5754529263, 1.4999864822), (3.2974111593, 1.3177696431), (3.2531321585, 0.9883010481))
            ThreePointArc((3.2531321585, 0.9883010481), (3.399944, -1.4e-05), (3.2531309855, -0.9883329956))
            ThreePointArc((3.2531309855, -0.9883329956), (3.2974111593, -1.3177976431), (3.5754529349, -1.5000144258))
            ThreePointArc((3.5754529349, -1.5000144258), (3.8792555231, -1.6685151025), (3.999944, -1.99428))
            Line((3.999944, -1.99428), (3.999944, -3.500014))
            ThreePointArc((3.999944, -3.500014), (3.8534973906, -3.8535673906), (3.499944, -4.000014))
            Line((3.499944, -4.000014), (1.99421, -4.000014))
            ThreePointArc((1.99421, -4.000014), (1.6684451025, -3.8793255231), (1.4999444822, -3.5755229263))
            ThreePointArc((1.4999444822, -3.5755229263), (1.3177276431, -3.2974811593), (0.9882629956, -3.2532009855))
        make_face(mode=Mode.SUBTRACT)
        with BuildLine():
            ThreePointArc((11.3421941215, 9.5478376661), (9.8734155063, 9.8734575063), (9.5477956661, 11.3422361215))
            Line((9.5477956661, 11.3422361215), (9.914528, 12.349824))
            ThreePointArc((9.914528, 12.349824), (13.0434468843, 13.0434888843), (12.3497820253, 9.9145699306))
            Line((12.3497820253, 9.9145699306), (11.3421941215, 9.5478376661))
        make_face(mode=Mode.SUBTRACT)
    extrude(amount=F2_DEPTH, both=True)


solid = f2.part
